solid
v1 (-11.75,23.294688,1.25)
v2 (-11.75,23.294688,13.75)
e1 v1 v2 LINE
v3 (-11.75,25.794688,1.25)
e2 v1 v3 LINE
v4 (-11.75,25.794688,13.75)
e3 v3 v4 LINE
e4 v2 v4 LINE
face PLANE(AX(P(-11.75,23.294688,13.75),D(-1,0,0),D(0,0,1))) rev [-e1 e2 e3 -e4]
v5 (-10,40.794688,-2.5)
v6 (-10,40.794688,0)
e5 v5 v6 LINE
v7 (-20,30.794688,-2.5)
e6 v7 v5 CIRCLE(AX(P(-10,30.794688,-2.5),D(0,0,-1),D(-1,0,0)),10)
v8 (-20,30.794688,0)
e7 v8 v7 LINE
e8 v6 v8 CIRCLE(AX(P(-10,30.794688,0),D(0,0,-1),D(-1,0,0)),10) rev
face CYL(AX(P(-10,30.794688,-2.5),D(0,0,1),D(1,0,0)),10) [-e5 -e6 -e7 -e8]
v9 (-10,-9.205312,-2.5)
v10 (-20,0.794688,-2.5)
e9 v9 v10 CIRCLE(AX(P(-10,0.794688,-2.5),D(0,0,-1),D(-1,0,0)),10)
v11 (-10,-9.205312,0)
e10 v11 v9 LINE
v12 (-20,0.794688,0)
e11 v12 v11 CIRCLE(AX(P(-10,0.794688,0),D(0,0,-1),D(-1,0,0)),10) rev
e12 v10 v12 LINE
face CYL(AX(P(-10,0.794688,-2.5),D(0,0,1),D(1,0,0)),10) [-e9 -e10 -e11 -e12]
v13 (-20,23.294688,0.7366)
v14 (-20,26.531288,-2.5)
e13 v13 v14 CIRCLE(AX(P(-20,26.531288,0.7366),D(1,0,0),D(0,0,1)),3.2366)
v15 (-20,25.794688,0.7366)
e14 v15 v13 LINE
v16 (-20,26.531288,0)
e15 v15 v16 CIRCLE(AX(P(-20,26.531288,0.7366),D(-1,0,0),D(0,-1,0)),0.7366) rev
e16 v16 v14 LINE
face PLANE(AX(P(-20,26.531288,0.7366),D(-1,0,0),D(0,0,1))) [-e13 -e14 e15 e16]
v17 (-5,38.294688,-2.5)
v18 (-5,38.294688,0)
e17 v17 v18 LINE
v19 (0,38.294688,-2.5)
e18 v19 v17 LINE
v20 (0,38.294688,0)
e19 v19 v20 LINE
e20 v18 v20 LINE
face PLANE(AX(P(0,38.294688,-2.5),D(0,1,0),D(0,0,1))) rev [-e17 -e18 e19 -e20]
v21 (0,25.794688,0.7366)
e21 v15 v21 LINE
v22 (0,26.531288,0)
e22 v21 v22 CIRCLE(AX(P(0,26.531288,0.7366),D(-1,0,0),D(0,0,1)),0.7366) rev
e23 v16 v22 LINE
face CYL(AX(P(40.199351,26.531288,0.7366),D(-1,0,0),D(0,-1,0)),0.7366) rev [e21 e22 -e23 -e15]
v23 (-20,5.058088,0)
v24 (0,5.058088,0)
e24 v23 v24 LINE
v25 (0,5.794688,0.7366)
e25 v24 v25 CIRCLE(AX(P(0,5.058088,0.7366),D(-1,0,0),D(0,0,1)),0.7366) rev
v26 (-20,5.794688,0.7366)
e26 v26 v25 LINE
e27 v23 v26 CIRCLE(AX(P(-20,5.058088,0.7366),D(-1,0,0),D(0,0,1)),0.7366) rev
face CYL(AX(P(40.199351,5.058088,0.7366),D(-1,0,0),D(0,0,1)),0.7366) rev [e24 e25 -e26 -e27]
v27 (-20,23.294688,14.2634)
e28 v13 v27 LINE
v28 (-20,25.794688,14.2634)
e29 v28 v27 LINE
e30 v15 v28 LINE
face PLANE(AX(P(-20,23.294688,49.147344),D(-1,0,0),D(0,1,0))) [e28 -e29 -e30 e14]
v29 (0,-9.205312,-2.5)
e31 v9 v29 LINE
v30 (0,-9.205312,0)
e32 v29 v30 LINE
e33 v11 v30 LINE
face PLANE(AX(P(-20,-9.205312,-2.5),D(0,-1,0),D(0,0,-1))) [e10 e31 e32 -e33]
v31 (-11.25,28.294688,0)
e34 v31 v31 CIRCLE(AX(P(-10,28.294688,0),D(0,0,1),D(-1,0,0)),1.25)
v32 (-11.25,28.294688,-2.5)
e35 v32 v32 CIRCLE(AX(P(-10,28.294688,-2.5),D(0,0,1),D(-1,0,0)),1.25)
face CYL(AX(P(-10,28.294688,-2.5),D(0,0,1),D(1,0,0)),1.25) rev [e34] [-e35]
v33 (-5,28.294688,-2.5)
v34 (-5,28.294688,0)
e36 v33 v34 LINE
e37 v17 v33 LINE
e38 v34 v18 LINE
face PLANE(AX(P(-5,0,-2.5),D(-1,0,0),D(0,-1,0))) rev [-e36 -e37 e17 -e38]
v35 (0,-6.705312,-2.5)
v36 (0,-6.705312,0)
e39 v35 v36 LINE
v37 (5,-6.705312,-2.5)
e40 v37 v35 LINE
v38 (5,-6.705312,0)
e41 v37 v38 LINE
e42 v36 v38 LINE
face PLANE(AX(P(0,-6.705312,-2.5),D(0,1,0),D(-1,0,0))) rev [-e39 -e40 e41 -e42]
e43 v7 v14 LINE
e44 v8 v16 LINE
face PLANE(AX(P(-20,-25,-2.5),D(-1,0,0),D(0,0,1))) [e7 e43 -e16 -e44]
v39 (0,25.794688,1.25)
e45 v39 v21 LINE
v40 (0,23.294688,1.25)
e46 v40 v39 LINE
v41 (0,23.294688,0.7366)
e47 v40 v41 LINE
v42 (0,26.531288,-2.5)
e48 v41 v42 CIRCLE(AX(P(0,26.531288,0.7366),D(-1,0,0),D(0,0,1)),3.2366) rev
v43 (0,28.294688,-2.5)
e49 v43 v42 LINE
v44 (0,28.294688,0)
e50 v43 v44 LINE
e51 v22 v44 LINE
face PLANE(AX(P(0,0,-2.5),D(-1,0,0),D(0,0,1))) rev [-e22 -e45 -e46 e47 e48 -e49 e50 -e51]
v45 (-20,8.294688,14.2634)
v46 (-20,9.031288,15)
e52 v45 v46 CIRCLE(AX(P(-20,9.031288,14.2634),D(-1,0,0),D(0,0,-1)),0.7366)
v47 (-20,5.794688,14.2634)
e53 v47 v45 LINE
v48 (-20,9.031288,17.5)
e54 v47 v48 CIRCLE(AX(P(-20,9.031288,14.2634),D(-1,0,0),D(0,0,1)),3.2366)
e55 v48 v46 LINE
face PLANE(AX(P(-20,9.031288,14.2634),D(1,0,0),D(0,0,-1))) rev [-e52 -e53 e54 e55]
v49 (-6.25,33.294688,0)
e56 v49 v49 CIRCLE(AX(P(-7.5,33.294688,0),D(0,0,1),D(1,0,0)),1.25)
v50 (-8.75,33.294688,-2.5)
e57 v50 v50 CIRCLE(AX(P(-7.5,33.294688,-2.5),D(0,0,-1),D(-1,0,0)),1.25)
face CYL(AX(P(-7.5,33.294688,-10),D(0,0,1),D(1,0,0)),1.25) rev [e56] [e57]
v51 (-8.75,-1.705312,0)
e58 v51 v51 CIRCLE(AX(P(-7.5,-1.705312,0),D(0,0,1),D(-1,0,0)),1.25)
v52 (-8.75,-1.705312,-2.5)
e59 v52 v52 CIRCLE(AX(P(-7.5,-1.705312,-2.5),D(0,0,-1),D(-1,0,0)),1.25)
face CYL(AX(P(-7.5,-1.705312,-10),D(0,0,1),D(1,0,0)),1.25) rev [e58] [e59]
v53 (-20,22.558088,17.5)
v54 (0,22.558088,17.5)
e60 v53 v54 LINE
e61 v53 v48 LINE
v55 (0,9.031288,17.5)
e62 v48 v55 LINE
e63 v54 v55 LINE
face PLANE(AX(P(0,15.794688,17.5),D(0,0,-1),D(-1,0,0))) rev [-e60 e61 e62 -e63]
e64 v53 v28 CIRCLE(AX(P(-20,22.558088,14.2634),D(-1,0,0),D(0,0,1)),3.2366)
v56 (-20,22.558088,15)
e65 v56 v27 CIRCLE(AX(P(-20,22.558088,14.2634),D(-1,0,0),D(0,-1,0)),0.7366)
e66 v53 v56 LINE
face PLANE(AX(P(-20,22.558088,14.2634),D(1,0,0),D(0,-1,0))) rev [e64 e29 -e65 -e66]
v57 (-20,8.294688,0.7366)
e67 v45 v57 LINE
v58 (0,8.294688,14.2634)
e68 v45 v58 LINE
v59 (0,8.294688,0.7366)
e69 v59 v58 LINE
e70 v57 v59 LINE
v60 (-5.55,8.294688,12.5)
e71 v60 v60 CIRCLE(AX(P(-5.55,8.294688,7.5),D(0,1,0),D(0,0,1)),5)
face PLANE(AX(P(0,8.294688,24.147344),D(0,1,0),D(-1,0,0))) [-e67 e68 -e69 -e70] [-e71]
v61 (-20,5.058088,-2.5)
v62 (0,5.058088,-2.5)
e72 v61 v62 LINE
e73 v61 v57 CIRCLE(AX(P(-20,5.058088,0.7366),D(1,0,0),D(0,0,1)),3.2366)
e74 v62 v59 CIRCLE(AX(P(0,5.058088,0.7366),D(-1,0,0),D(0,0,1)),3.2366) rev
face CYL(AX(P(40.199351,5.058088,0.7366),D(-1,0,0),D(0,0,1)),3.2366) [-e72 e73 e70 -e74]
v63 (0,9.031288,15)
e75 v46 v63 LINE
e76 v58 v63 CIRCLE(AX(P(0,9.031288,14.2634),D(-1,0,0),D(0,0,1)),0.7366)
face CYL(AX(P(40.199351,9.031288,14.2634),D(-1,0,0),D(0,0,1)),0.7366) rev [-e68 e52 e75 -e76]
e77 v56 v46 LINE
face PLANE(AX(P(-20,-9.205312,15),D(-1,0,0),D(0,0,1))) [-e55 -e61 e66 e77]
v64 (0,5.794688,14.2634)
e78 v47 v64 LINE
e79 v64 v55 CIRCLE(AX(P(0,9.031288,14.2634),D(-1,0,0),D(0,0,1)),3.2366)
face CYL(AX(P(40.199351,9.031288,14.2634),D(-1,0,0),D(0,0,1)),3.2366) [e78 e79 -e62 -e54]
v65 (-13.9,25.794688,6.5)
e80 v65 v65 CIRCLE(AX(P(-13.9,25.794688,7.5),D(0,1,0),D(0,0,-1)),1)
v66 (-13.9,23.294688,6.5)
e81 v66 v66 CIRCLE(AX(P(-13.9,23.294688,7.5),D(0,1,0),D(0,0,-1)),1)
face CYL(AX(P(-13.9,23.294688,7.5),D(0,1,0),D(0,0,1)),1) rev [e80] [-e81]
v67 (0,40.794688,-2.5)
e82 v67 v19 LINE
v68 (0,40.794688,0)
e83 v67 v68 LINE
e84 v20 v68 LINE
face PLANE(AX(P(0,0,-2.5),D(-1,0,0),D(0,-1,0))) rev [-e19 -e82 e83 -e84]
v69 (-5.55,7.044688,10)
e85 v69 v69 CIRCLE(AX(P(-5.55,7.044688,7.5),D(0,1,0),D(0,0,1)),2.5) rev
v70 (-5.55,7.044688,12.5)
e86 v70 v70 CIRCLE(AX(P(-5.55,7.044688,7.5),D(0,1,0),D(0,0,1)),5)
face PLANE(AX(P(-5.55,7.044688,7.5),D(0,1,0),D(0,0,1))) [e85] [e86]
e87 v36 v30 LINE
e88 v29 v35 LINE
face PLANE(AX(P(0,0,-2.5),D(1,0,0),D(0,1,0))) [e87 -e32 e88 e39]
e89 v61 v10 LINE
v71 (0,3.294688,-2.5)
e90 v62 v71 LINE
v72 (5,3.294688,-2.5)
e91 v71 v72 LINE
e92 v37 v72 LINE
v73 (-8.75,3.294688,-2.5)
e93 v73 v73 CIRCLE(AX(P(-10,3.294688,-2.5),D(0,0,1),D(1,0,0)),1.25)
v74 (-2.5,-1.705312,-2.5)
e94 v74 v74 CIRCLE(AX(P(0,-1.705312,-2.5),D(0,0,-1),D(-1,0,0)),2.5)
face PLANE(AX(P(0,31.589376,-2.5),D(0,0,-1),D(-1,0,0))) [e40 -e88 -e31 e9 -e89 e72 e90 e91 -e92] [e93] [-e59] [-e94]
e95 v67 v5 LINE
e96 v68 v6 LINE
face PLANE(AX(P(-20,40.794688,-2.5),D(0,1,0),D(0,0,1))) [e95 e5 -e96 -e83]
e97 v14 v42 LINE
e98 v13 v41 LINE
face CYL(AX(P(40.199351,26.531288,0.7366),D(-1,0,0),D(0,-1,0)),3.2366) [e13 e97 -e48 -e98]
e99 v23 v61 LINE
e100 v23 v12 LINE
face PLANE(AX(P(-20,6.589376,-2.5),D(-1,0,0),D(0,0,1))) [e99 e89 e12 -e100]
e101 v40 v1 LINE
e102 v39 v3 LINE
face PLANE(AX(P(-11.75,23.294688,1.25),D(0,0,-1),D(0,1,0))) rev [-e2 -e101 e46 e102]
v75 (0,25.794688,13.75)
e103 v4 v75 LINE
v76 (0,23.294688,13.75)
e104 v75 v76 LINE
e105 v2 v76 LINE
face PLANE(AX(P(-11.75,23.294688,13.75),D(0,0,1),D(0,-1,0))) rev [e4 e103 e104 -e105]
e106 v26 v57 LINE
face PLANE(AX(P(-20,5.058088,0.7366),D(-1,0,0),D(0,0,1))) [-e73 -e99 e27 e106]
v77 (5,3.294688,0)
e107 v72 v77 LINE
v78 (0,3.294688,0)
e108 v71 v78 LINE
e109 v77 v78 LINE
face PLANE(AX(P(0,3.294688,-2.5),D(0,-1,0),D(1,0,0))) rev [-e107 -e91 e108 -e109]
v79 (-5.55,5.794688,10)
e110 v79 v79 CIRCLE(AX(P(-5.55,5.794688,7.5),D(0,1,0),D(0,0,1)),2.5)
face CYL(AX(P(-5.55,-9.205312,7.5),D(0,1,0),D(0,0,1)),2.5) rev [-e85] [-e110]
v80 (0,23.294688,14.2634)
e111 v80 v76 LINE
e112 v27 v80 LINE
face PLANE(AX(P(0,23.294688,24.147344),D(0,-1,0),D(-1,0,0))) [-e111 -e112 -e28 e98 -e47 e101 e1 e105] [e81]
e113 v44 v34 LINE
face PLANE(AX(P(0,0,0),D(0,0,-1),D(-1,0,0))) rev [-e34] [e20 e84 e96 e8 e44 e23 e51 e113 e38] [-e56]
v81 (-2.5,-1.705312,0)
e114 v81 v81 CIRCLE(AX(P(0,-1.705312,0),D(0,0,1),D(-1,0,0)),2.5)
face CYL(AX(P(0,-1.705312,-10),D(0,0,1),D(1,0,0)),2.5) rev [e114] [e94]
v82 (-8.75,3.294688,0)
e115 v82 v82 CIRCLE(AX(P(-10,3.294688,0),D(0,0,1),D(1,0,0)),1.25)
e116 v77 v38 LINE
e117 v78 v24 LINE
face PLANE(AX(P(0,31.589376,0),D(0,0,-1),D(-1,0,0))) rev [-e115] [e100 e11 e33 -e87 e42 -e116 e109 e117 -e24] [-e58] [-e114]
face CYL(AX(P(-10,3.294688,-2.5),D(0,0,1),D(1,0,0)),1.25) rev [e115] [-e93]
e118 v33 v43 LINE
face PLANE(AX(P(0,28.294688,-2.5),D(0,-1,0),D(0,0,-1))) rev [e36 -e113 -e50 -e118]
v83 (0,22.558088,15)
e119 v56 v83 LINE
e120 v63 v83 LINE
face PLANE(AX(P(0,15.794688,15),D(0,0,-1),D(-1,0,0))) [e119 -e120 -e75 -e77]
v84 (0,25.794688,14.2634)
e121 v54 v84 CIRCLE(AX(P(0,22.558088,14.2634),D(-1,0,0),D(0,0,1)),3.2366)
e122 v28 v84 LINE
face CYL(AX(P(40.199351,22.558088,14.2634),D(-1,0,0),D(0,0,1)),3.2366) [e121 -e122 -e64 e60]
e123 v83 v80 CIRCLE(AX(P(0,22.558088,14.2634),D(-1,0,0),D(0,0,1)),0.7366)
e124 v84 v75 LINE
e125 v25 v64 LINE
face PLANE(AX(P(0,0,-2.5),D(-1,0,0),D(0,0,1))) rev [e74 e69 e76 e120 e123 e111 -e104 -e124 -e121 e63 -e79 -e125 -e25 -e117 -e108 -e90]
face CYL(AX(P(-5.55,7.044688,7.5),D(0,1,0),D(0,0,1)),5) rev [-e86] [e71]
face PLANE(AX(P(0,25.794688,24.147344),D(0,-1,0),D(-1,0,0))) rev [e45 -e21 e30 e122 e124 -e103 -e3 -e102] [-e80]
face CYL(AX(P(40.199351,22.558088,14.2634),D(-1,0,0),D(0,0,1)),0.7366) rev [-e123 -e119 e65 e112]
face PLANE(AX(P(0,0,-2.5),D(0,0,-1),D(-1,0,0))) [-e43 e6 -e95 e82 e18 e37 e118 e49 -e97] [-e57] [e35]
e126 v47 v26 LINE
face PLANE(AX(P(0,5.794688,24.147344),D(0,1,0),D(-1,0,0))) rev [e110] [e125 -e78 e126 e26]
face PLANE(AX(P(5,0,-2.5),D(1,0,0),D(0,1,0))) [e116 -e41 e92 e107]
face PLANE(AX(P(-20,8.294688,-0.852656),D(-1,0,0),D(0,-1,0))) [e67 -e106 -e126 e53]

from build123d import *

# Parameters (mm, degrees)
SKETCH1_W           = 40
SKETCH1_H           = 50
SKETCH1_R           = 1.25
BASE_FLANGE1_DEPTH  = 2.5
SKETCH15_R          = 1
CUT_EXTRUDE3_DEPTH  = 10
JOG3_START          = -2.5
JOG3_OUTLINE_W      = 40
JOG3_OUTLINE_H      = 48.294687966
JOG3_OUTLINE_R      = 1
JOG3_OUTLINE_R_2    = 1.25
JOG3_DEPTH          = 2.5
JOG3_2_OUTLINE_W    = 40
JOG3_2_OUTLINE_H    = 1.705312034
JOG3_2_DEPTH        = 0.332528284
JOG3_START_2        = 14.2634
JOG3_3_OUTLINE_W    = 40
JOG3_3_OUTLINE_H    = 35
JOG3_3_OUTLINE_R    = 1
JOG3_3_OUTLINE_R_2  = 1.25
JOG3_3_DEPTH        = 3.2366
JOG3_4_OUTLINE_W    = 40
JOG3_4_OUTLINE_H    = 15.794687966
JOG3_4_OUTLINE_R    = 1.25
JOG3_4_DEPTH        = 3.2366
JOG3_5_OUTLINE_W    = 40
JOG3_5_OUTLINE_H    = 2.5
JOG3_5_DEPTH        = 15
JOG3_START_3        = 15
JOG3_6_OUTLINE_R    = 1.25
JOG3_6_OUTLINE_R_2  = 1
JOG3_6_DEPTH        = 2.5
JOG3_START_4        = -20
JOG3_7_DEPTH        = 40
JOG4_START          = -20
JOG4_DEPTH          = 40
JOG4_2_DEPTH        = 40
JOG4_START_2        = -3
JOG4_3_OUTLINE_R    = 1.25
JOG4_3_DEPTH        = 4
FILLET1_R           = 10
SKETCH18_R          = 2.5
BOSS_EXTRUDE1_DEPTH = 2.5
SKETCH19_R          = 1
SKETCH19_W          = 23.5
SKETCH19_H          = 12.5
CUT_EXTRUDE4_DEPTH  = 2.5
SKETCH20_R          = 2.5
SKETCH20_R_2        = 1.25
CUT_EXTRUDE6_DEPTH  = 10
SKETCH23_R          = 2.5
CUT_EXTRUDE7_DEPTH  = 44.945989578
SKETCH24_R          = 5
CUT_EXTRUDE8_DEPTH  = 1.25
SKETCH25_W          = 20
SKETCH25_H          = 13.5268
CUT_EXTRUDE11_DEPTH = 50.640775238


with BuildPart() as part:
    # Base-Flange1: sheet metal written as solids
    # Sketch1 → Base-Flange1 (new body)
    with BuildSketch(Plane.XY):
        Rectangle(SKETCH1_W, SKETCH1_H)
        with Locations((10, 12.5)):
            Circle(SKETCH1_R, mode=Mode.SUBTRACT)
        with Locations(Location((10, -12.5, 0), (0, 0, 180))):
            Circle(SKETCH1_R, mode=Mode.SUBTRACT)
        with Locations((-10, -12.5)):
            Circle(SKETCH1_R, mode=Mode.SUBTRACT)
        with Locations(Location((-10, 12.5, 0), (0, 0, 180))):
            Circle(SKETCH1_R, mode=Mode.SUBTRACT)
    extrude(amount=-BASE_FLANGE1_DEPTH)

    # Sketch15 → Cut-Extrude3 (cut)
    with BuildSketch(Plane.XY):
        with Locations((12, 0)):
            Circle(SKETCH15_R)
        with Locations(Location((-17, 0, 0), (0, 0, 180))):
            Circle(SKETCH15_R)
    extrude(amount=-CUT_EXTRUDE3_DEPTH, mode=Mode.SUBTRACT)

    # Jog3: read off the stored shape, not the designer's step
    # Jog3 outline → Jog3 (cut)
    with BuildSketch(Plane.XY.offset(JOG3_START)):
        with Locations((0, -0.852656017)):
            Rectangle(JOG3_OUTLINE_W, JOG3_OUTLINE_H)
        with Locations((-17, 0)):
            Circle(JOG3_OUTLINE_R, mode=Mode.SUBTRACT)
        with Locations((12, 0)):
            Circle(JOG3_OUTLINE_R, mode=Mode.SUBTRACT)
        with Locations((-10, 12.5)):
            Circle(JOG3_OUTLINE_R_2, mode=Mode.SUBTRACT)
        with Locations((10, 12.5)):
            Circle(JOG3_OUTLINE_R_2, mode=Mode.SUBTRACT)
        with Locations((10, -12.5)):
            Circle(JOG3_OUTLINE_R_2, mode=Mode.SUBTRACT)
        with Locations((-10, -12.5)):
            Circle(JOG3_OUTLINE_R_2, mode=Mode.SUBTRACT)
    extrude(amount=JOG3_DEPTH, mode=Mode.SUBTRACT)

    # Jog3 2 outline → Jog3 2 (cut)
    with BuildSketch(Plane.XY.offset(JOG3_START)):
        with Locations((0, 24.147343983)):
            Rectangle(JOG3_2_OUTLINE_W, JOG3_2_OUTLINE_H)
    extrude(amount=JOG3_2_DEPTH, mode=Mode.SUBTRACT)

    # Jog3 4 outline → Jog3 4 (add)
    with BuildSketch(Plane.XY.offset(JOG3_START)):
        with Locations((0, 32.897343983)):
            Rectangle(JOG3_4_OUTLINE_W, JOG3_4_OUTLINE_H)
        with Locations((10, 28.294687966)):
            Circle(JOG3_4_OUTLINE_R, mode=Mode.SUBTRACT)
        with Locations((-10, 28.294687966)):
            Circle(JOG3_4_OUTLINE_R, mode=Mode.SUBTRACT)
    extrude(amount=JOG3_4_DEPTH)



with BuildPart() as body_2:
    # Jog3 3 outline → Jog3 3 (new body)
    with BuildSketch(Plane.XY.offset(JOG3_START_2)):
        with Locations((0, 8.294687966)):
            Rectangle(JOG3_3_OUTLINE_W, JOG3_3_OUTLINE_H)
        with Locations((12, 15.794687966)):
            Circle(JOG3_3_OUTLINE_R, mode=Mode.SUBTRACT)
        with Locations((-17, 0)):
            Circle(JOG3_3_OUTLINE_R, mode=Mode.SUBTRACT)
        with Locations((-10, 3.294687966)):
            Circle(JOG3_3_OUTLINE_R_2, mode=Mode.SUBTRACT)
        with Locations((12, 0)):
            Circle(JOG3_3_OUTLINE_R, mode=Mode.SUBTRACT)
        with Locations((10, 3.294687966)):
            Circle(JOG3_3_OUTLINE_R_2, mode=Mode.SUBTRACT)
        with Locations((-17, 15.794687966)):
            Circle(JOG3_3_OUTLINE_R, mode=Mode.SUBTRACT)
        with Locations((-10, 12.5)):
            Circle(JOG3_3_OUTLINE_R_2, mode=Mode.SUBTRACT)
        with Locations((10, 12.5)):
            Circle(JOG3_3_OUTLINE_R_2, mode=Mode.SUBTRACT)
    extrude(amount=JOG3_3_DEPTH)


with BuildPart() as part_1:
    add(part.part)

    add(body_2.part)  # Jog3 5 merges body 2
    # Jog3 5 outline → Jog3 5 (add)
    with BuildSketch(Plane.XY):
        with Locations((0, 24.544687966)):
            Rectangle(JOG3_5_OUTLINE_W, JOG3_5_OUTLINE_H)
    extrude(amount=JOG3_5_DEPTH)

    # Jog3 6 outline → Jog3 6 (add)
    with BuildSketch(Plane.XY.offset(JOG3_START_3)):
        with Locations((10, 12.5)):
            Circle(JOG3_6_OUTLINE_R)
        with Locations((-10, 12.5)):
            Circle(JOG3_6_OUTLINE_R)
        with Locations((12, 0)):
            Circle(JOG3_6_OUTLINE_R_2)
        with Locations((-17, 0)):
            Circle(JOG3_6_OUTLINE_R_2)
    extrude(amount=JOG3_6_DEPTH)

    # Jog3 7 outline → Jog3 7 (cut)
    with BuildSketch(Plane.YZ.offset(JOG3_START_4)):
        with BuildLine():
            ThreePointArc((23.294687966, 14.2634), (23.078942821, 14.784254855), (22.558087966, 15))
            Line((22.558087966, 15), (-9.205312034, 15))
            Line((-9.205312034, 15), (-9.205312034, 14.2634))
            Line((-9.205312034, 14.2634), (23.294687966, 14.2634))
        make_face()
        with BuildLine():
            ThreePointArc((26.531287966, -2.5), (24.242666158, -1.552021808), (23.294687966, 0.7366))
            Line((23.294687966, 0.7366), (23.294687966, -2.167471716))
            Line((23.294687966, -2.167471716), (25, -2.167471716))
            Line((25, -2.167471716), (25, -2.5))
            Line((25, -2.5), (26.531287966, -2.5))
        make_face()
        with BuildLine():
            Line((26.531287966, 0), (40.794687966, 0))
            Line((40.794687966, 0), (40.794687966, 0.7366))
            Line((40.794687966, 0.7366), (25.794687966, 0.7366))
            ThreePointArc((25.794687966, 0.7366), (26.010433111, 0.215745145), (26.531287966, 0))
        make_face()
        with BuildLine():
            Line((25.794687966, 17.5), (22.558087966, 17.5))
            ThreePointArc((22.558087966, 17.5), (24.846709774, 16.552021808), (25.794687966, 14.2634))
            Line((25.794687966, 14.2634), (25.794687966, 17.5))
        make_face()
    extrude(amount=JOG3_7_DEPTH, mode=Mode.SUBTRACT)

    # Jog4: read off the stored shape, not the designer's step
    # Jog4 outline → Jog4 (cut)
    with BuildSketch(Plane.YZ.offset(JOG4_START)):
        with BuildLine():
            Line((-9.205312034, 15), (5.87962174, 15))
            ThreePointArc((5.87962174, 15), (7.019882984, 16.799110859), (9.031287966, 17.5))
            Line((9.031287966, 17.5), (-9.205312034, 17.5))
            Line((-9.205312034, 17.5), (-9.205312034, 15))
        make_face()
    extrude(amount=JOG4_DEPTH, mode=Mode.SUBTRACT)

    # Jog4 2 outline → Jog4 2 (add)
    with BuildSketch(Plane.YZ.offset(JOG4_START)):
        with BuildLine():
            Line((-9.205312034, 0), (-9.205312034, -2.5))
            Line((-9.205312034, -2.5), (5.058087966, -2.5))
            ThreePointArc((5.058087966, -2.5), (7.346709774, -1.552021808), (8.294687966, 0.7366))
            Line((8.294687966, 0.7366), (8.294687966, 14.2634))
            ThreePointArc((8.294687966, 14.2634), (8.510433111, 14.784254855), (9.031287966, 15))
            Line((9.031287966, 15), (5.87962174, 15))
            ThreePointArc((5.87962174, 15), (5.81599152, 14.634140241), (5.794687966, 14.2634))
            Line((5.794687966, 14.2634), (5.794687966, 0.7366))
            ThreePointArc((5.794687966, 0.7366), (5.578942821, 0.215745145), (5.058087966, 0))
            Line((5.058087966, 0), (-9.205312034, 0))
        make_face()
    extrude(amount=JOG4_2_DEPTH)

    # Jog4 3 outline → Jog4 3 (cut)
    with BuildSketch(Plane.XY.offset(JOG4_START_2)):
        with Locations((-10, 3.294687966)):
            Circle(JOG4_3_OUTLINE_R)
        with Locations((10, 3.294687966)):
            Circle(JOG4_3_OUTLINE_R)
    extrude(amount=JOG4_3_DEPTH, mode=Mode.SUBTRACT)

    # Fillet1
    fillet1_edges = [part_1.edges().sort_by_distance(p)[0] for p in [
        (20, -9.205312034, -1.25),
        (-20, -9.205312034, -1.25),
        (-20, 40.794687966, -1.25),
        (20, 40.794687966, -1.25),
    ]]
    fillet(fillet1_edges, radius=FILLET1_R)

    # Sketch18 → Boss-Extrude1 (add)
    with BuildSketch(Plane.XY.offset(17.5)):
        with Locations((12, 15.794687966)):
            Circle(SKETCH18_R)
        with Locations((-17, 15.794687966)):
            Circle(SKETCH18_R)
    extrude(amount=-BOSS_EXTRUDE1_DEPTH)

    # Sketch19 → Cut-Extrude4 (cut)
    with BuildSketch(Plane(origin=(0, 25.794687966, 0), x_dir=(1, 0, 0), z_dir=(0, 1, 0))):
        with Locations(Location((13.9, -7.5, 0), (0, 0, 270))):
            Circle(SKETCH19_R)
        with Locations(Location((-13.9, -7.5, 0), (0, 0, 90))):
            Circle(SKETCH19_R)
        with Locations((0, -7.5)):
            Rectangle(SKETCH19_W, SKETCH19_H)
    extrude(amount=-CUT_EXTRUDE4_DEPTH, mode=Mode.SUBTRACT)

    # Sketch20 → Cut-Extrude6 (cut)
    with BuildSketch(Plane.XY):
        with Locations((0, 33.294687966)):
            Circle(SKETCH20_R)
        with Locations(Location((0, -1.705312034, 0), (0, 0, 180))):
            Circle(SKETCH20_R)
        with Locations((7.5, -1.705312034)):
            Circle(SKETCH20_R_2)
        with Locations(Location((-7.5, -1.705312034, 0), (0, 0, 180))):
            Circle(SKETCH20_R_2)
        with Locations(Location((7.5, 33.294687966, 0), (0, 0, 180))):
            Circle(SKETCH20_R_2)
        with Locations((-7.5, 33.294687966)):
            Circle(SKETCH20_R_2)
    extrude(amount=-CUT_EXTRUDE6_DEPTH, mode=Mode.SUBTRACT)

    # Sketch23 → Cut-Extrude7 (cut, through all)
    with BuildSketch(Plane(origin=(0, 25.794687966, 0), x_dir=(1, 0, 0), z_dir=(0, 1, 0))):
        with Locations(Location((-5.55, -7.5, 0), (0, 0, 270))):
            Circle(SKETCH23_R)
    extrude(amount=-CUT_EXTRUDE7_DEPTH, mode=Mode.SUBTRACT)

    # Sketch24 → Cut-Extrude8 (cut)
    with BuildSketch(Plane(origin=(0, 8.294687966, 0), x_dir=(1, 0, 0), z_dir=(0, 1, 0))):
        with Locations(Location((-5.55, -7.5, 0), (0, 0, 270))):
            Circle(SKETCH24_R)
    extrude(amount=-CUT_EXTRUDE8_DEPTH, mode=Mode.SUBTRACT)

    # Sketch25 → Cut-Extrude11 (cut, through all)
    with BuildSketch(Plane.XY.offset(17.5)):
        Polygon((20, 40.794687966), (0, 40.794687966), (0, 38.294687966), (-5, 38.294687966), (-5, 28.294687966), (0, 28.294687966), (0, 22.558087966), (20, 22.558087966), align=None)
        with Locations((10, 15.794687966)):
            Rectangle(SKETCH25_W, SKETCH25_H)
        Polygon((20, -9.205312034), (20, 9.031287966), (0, 9.031287966), (0, 3.294687966), (5, 3.294687966), (5, -6.705312034), (0, -6.705312034), (0, -9.205312034), align=None)
    extrude(amount=-CUT_EXTRUDE11_DEPTH, mode=Mode.SUBTRACT)


solid = part_1.part
